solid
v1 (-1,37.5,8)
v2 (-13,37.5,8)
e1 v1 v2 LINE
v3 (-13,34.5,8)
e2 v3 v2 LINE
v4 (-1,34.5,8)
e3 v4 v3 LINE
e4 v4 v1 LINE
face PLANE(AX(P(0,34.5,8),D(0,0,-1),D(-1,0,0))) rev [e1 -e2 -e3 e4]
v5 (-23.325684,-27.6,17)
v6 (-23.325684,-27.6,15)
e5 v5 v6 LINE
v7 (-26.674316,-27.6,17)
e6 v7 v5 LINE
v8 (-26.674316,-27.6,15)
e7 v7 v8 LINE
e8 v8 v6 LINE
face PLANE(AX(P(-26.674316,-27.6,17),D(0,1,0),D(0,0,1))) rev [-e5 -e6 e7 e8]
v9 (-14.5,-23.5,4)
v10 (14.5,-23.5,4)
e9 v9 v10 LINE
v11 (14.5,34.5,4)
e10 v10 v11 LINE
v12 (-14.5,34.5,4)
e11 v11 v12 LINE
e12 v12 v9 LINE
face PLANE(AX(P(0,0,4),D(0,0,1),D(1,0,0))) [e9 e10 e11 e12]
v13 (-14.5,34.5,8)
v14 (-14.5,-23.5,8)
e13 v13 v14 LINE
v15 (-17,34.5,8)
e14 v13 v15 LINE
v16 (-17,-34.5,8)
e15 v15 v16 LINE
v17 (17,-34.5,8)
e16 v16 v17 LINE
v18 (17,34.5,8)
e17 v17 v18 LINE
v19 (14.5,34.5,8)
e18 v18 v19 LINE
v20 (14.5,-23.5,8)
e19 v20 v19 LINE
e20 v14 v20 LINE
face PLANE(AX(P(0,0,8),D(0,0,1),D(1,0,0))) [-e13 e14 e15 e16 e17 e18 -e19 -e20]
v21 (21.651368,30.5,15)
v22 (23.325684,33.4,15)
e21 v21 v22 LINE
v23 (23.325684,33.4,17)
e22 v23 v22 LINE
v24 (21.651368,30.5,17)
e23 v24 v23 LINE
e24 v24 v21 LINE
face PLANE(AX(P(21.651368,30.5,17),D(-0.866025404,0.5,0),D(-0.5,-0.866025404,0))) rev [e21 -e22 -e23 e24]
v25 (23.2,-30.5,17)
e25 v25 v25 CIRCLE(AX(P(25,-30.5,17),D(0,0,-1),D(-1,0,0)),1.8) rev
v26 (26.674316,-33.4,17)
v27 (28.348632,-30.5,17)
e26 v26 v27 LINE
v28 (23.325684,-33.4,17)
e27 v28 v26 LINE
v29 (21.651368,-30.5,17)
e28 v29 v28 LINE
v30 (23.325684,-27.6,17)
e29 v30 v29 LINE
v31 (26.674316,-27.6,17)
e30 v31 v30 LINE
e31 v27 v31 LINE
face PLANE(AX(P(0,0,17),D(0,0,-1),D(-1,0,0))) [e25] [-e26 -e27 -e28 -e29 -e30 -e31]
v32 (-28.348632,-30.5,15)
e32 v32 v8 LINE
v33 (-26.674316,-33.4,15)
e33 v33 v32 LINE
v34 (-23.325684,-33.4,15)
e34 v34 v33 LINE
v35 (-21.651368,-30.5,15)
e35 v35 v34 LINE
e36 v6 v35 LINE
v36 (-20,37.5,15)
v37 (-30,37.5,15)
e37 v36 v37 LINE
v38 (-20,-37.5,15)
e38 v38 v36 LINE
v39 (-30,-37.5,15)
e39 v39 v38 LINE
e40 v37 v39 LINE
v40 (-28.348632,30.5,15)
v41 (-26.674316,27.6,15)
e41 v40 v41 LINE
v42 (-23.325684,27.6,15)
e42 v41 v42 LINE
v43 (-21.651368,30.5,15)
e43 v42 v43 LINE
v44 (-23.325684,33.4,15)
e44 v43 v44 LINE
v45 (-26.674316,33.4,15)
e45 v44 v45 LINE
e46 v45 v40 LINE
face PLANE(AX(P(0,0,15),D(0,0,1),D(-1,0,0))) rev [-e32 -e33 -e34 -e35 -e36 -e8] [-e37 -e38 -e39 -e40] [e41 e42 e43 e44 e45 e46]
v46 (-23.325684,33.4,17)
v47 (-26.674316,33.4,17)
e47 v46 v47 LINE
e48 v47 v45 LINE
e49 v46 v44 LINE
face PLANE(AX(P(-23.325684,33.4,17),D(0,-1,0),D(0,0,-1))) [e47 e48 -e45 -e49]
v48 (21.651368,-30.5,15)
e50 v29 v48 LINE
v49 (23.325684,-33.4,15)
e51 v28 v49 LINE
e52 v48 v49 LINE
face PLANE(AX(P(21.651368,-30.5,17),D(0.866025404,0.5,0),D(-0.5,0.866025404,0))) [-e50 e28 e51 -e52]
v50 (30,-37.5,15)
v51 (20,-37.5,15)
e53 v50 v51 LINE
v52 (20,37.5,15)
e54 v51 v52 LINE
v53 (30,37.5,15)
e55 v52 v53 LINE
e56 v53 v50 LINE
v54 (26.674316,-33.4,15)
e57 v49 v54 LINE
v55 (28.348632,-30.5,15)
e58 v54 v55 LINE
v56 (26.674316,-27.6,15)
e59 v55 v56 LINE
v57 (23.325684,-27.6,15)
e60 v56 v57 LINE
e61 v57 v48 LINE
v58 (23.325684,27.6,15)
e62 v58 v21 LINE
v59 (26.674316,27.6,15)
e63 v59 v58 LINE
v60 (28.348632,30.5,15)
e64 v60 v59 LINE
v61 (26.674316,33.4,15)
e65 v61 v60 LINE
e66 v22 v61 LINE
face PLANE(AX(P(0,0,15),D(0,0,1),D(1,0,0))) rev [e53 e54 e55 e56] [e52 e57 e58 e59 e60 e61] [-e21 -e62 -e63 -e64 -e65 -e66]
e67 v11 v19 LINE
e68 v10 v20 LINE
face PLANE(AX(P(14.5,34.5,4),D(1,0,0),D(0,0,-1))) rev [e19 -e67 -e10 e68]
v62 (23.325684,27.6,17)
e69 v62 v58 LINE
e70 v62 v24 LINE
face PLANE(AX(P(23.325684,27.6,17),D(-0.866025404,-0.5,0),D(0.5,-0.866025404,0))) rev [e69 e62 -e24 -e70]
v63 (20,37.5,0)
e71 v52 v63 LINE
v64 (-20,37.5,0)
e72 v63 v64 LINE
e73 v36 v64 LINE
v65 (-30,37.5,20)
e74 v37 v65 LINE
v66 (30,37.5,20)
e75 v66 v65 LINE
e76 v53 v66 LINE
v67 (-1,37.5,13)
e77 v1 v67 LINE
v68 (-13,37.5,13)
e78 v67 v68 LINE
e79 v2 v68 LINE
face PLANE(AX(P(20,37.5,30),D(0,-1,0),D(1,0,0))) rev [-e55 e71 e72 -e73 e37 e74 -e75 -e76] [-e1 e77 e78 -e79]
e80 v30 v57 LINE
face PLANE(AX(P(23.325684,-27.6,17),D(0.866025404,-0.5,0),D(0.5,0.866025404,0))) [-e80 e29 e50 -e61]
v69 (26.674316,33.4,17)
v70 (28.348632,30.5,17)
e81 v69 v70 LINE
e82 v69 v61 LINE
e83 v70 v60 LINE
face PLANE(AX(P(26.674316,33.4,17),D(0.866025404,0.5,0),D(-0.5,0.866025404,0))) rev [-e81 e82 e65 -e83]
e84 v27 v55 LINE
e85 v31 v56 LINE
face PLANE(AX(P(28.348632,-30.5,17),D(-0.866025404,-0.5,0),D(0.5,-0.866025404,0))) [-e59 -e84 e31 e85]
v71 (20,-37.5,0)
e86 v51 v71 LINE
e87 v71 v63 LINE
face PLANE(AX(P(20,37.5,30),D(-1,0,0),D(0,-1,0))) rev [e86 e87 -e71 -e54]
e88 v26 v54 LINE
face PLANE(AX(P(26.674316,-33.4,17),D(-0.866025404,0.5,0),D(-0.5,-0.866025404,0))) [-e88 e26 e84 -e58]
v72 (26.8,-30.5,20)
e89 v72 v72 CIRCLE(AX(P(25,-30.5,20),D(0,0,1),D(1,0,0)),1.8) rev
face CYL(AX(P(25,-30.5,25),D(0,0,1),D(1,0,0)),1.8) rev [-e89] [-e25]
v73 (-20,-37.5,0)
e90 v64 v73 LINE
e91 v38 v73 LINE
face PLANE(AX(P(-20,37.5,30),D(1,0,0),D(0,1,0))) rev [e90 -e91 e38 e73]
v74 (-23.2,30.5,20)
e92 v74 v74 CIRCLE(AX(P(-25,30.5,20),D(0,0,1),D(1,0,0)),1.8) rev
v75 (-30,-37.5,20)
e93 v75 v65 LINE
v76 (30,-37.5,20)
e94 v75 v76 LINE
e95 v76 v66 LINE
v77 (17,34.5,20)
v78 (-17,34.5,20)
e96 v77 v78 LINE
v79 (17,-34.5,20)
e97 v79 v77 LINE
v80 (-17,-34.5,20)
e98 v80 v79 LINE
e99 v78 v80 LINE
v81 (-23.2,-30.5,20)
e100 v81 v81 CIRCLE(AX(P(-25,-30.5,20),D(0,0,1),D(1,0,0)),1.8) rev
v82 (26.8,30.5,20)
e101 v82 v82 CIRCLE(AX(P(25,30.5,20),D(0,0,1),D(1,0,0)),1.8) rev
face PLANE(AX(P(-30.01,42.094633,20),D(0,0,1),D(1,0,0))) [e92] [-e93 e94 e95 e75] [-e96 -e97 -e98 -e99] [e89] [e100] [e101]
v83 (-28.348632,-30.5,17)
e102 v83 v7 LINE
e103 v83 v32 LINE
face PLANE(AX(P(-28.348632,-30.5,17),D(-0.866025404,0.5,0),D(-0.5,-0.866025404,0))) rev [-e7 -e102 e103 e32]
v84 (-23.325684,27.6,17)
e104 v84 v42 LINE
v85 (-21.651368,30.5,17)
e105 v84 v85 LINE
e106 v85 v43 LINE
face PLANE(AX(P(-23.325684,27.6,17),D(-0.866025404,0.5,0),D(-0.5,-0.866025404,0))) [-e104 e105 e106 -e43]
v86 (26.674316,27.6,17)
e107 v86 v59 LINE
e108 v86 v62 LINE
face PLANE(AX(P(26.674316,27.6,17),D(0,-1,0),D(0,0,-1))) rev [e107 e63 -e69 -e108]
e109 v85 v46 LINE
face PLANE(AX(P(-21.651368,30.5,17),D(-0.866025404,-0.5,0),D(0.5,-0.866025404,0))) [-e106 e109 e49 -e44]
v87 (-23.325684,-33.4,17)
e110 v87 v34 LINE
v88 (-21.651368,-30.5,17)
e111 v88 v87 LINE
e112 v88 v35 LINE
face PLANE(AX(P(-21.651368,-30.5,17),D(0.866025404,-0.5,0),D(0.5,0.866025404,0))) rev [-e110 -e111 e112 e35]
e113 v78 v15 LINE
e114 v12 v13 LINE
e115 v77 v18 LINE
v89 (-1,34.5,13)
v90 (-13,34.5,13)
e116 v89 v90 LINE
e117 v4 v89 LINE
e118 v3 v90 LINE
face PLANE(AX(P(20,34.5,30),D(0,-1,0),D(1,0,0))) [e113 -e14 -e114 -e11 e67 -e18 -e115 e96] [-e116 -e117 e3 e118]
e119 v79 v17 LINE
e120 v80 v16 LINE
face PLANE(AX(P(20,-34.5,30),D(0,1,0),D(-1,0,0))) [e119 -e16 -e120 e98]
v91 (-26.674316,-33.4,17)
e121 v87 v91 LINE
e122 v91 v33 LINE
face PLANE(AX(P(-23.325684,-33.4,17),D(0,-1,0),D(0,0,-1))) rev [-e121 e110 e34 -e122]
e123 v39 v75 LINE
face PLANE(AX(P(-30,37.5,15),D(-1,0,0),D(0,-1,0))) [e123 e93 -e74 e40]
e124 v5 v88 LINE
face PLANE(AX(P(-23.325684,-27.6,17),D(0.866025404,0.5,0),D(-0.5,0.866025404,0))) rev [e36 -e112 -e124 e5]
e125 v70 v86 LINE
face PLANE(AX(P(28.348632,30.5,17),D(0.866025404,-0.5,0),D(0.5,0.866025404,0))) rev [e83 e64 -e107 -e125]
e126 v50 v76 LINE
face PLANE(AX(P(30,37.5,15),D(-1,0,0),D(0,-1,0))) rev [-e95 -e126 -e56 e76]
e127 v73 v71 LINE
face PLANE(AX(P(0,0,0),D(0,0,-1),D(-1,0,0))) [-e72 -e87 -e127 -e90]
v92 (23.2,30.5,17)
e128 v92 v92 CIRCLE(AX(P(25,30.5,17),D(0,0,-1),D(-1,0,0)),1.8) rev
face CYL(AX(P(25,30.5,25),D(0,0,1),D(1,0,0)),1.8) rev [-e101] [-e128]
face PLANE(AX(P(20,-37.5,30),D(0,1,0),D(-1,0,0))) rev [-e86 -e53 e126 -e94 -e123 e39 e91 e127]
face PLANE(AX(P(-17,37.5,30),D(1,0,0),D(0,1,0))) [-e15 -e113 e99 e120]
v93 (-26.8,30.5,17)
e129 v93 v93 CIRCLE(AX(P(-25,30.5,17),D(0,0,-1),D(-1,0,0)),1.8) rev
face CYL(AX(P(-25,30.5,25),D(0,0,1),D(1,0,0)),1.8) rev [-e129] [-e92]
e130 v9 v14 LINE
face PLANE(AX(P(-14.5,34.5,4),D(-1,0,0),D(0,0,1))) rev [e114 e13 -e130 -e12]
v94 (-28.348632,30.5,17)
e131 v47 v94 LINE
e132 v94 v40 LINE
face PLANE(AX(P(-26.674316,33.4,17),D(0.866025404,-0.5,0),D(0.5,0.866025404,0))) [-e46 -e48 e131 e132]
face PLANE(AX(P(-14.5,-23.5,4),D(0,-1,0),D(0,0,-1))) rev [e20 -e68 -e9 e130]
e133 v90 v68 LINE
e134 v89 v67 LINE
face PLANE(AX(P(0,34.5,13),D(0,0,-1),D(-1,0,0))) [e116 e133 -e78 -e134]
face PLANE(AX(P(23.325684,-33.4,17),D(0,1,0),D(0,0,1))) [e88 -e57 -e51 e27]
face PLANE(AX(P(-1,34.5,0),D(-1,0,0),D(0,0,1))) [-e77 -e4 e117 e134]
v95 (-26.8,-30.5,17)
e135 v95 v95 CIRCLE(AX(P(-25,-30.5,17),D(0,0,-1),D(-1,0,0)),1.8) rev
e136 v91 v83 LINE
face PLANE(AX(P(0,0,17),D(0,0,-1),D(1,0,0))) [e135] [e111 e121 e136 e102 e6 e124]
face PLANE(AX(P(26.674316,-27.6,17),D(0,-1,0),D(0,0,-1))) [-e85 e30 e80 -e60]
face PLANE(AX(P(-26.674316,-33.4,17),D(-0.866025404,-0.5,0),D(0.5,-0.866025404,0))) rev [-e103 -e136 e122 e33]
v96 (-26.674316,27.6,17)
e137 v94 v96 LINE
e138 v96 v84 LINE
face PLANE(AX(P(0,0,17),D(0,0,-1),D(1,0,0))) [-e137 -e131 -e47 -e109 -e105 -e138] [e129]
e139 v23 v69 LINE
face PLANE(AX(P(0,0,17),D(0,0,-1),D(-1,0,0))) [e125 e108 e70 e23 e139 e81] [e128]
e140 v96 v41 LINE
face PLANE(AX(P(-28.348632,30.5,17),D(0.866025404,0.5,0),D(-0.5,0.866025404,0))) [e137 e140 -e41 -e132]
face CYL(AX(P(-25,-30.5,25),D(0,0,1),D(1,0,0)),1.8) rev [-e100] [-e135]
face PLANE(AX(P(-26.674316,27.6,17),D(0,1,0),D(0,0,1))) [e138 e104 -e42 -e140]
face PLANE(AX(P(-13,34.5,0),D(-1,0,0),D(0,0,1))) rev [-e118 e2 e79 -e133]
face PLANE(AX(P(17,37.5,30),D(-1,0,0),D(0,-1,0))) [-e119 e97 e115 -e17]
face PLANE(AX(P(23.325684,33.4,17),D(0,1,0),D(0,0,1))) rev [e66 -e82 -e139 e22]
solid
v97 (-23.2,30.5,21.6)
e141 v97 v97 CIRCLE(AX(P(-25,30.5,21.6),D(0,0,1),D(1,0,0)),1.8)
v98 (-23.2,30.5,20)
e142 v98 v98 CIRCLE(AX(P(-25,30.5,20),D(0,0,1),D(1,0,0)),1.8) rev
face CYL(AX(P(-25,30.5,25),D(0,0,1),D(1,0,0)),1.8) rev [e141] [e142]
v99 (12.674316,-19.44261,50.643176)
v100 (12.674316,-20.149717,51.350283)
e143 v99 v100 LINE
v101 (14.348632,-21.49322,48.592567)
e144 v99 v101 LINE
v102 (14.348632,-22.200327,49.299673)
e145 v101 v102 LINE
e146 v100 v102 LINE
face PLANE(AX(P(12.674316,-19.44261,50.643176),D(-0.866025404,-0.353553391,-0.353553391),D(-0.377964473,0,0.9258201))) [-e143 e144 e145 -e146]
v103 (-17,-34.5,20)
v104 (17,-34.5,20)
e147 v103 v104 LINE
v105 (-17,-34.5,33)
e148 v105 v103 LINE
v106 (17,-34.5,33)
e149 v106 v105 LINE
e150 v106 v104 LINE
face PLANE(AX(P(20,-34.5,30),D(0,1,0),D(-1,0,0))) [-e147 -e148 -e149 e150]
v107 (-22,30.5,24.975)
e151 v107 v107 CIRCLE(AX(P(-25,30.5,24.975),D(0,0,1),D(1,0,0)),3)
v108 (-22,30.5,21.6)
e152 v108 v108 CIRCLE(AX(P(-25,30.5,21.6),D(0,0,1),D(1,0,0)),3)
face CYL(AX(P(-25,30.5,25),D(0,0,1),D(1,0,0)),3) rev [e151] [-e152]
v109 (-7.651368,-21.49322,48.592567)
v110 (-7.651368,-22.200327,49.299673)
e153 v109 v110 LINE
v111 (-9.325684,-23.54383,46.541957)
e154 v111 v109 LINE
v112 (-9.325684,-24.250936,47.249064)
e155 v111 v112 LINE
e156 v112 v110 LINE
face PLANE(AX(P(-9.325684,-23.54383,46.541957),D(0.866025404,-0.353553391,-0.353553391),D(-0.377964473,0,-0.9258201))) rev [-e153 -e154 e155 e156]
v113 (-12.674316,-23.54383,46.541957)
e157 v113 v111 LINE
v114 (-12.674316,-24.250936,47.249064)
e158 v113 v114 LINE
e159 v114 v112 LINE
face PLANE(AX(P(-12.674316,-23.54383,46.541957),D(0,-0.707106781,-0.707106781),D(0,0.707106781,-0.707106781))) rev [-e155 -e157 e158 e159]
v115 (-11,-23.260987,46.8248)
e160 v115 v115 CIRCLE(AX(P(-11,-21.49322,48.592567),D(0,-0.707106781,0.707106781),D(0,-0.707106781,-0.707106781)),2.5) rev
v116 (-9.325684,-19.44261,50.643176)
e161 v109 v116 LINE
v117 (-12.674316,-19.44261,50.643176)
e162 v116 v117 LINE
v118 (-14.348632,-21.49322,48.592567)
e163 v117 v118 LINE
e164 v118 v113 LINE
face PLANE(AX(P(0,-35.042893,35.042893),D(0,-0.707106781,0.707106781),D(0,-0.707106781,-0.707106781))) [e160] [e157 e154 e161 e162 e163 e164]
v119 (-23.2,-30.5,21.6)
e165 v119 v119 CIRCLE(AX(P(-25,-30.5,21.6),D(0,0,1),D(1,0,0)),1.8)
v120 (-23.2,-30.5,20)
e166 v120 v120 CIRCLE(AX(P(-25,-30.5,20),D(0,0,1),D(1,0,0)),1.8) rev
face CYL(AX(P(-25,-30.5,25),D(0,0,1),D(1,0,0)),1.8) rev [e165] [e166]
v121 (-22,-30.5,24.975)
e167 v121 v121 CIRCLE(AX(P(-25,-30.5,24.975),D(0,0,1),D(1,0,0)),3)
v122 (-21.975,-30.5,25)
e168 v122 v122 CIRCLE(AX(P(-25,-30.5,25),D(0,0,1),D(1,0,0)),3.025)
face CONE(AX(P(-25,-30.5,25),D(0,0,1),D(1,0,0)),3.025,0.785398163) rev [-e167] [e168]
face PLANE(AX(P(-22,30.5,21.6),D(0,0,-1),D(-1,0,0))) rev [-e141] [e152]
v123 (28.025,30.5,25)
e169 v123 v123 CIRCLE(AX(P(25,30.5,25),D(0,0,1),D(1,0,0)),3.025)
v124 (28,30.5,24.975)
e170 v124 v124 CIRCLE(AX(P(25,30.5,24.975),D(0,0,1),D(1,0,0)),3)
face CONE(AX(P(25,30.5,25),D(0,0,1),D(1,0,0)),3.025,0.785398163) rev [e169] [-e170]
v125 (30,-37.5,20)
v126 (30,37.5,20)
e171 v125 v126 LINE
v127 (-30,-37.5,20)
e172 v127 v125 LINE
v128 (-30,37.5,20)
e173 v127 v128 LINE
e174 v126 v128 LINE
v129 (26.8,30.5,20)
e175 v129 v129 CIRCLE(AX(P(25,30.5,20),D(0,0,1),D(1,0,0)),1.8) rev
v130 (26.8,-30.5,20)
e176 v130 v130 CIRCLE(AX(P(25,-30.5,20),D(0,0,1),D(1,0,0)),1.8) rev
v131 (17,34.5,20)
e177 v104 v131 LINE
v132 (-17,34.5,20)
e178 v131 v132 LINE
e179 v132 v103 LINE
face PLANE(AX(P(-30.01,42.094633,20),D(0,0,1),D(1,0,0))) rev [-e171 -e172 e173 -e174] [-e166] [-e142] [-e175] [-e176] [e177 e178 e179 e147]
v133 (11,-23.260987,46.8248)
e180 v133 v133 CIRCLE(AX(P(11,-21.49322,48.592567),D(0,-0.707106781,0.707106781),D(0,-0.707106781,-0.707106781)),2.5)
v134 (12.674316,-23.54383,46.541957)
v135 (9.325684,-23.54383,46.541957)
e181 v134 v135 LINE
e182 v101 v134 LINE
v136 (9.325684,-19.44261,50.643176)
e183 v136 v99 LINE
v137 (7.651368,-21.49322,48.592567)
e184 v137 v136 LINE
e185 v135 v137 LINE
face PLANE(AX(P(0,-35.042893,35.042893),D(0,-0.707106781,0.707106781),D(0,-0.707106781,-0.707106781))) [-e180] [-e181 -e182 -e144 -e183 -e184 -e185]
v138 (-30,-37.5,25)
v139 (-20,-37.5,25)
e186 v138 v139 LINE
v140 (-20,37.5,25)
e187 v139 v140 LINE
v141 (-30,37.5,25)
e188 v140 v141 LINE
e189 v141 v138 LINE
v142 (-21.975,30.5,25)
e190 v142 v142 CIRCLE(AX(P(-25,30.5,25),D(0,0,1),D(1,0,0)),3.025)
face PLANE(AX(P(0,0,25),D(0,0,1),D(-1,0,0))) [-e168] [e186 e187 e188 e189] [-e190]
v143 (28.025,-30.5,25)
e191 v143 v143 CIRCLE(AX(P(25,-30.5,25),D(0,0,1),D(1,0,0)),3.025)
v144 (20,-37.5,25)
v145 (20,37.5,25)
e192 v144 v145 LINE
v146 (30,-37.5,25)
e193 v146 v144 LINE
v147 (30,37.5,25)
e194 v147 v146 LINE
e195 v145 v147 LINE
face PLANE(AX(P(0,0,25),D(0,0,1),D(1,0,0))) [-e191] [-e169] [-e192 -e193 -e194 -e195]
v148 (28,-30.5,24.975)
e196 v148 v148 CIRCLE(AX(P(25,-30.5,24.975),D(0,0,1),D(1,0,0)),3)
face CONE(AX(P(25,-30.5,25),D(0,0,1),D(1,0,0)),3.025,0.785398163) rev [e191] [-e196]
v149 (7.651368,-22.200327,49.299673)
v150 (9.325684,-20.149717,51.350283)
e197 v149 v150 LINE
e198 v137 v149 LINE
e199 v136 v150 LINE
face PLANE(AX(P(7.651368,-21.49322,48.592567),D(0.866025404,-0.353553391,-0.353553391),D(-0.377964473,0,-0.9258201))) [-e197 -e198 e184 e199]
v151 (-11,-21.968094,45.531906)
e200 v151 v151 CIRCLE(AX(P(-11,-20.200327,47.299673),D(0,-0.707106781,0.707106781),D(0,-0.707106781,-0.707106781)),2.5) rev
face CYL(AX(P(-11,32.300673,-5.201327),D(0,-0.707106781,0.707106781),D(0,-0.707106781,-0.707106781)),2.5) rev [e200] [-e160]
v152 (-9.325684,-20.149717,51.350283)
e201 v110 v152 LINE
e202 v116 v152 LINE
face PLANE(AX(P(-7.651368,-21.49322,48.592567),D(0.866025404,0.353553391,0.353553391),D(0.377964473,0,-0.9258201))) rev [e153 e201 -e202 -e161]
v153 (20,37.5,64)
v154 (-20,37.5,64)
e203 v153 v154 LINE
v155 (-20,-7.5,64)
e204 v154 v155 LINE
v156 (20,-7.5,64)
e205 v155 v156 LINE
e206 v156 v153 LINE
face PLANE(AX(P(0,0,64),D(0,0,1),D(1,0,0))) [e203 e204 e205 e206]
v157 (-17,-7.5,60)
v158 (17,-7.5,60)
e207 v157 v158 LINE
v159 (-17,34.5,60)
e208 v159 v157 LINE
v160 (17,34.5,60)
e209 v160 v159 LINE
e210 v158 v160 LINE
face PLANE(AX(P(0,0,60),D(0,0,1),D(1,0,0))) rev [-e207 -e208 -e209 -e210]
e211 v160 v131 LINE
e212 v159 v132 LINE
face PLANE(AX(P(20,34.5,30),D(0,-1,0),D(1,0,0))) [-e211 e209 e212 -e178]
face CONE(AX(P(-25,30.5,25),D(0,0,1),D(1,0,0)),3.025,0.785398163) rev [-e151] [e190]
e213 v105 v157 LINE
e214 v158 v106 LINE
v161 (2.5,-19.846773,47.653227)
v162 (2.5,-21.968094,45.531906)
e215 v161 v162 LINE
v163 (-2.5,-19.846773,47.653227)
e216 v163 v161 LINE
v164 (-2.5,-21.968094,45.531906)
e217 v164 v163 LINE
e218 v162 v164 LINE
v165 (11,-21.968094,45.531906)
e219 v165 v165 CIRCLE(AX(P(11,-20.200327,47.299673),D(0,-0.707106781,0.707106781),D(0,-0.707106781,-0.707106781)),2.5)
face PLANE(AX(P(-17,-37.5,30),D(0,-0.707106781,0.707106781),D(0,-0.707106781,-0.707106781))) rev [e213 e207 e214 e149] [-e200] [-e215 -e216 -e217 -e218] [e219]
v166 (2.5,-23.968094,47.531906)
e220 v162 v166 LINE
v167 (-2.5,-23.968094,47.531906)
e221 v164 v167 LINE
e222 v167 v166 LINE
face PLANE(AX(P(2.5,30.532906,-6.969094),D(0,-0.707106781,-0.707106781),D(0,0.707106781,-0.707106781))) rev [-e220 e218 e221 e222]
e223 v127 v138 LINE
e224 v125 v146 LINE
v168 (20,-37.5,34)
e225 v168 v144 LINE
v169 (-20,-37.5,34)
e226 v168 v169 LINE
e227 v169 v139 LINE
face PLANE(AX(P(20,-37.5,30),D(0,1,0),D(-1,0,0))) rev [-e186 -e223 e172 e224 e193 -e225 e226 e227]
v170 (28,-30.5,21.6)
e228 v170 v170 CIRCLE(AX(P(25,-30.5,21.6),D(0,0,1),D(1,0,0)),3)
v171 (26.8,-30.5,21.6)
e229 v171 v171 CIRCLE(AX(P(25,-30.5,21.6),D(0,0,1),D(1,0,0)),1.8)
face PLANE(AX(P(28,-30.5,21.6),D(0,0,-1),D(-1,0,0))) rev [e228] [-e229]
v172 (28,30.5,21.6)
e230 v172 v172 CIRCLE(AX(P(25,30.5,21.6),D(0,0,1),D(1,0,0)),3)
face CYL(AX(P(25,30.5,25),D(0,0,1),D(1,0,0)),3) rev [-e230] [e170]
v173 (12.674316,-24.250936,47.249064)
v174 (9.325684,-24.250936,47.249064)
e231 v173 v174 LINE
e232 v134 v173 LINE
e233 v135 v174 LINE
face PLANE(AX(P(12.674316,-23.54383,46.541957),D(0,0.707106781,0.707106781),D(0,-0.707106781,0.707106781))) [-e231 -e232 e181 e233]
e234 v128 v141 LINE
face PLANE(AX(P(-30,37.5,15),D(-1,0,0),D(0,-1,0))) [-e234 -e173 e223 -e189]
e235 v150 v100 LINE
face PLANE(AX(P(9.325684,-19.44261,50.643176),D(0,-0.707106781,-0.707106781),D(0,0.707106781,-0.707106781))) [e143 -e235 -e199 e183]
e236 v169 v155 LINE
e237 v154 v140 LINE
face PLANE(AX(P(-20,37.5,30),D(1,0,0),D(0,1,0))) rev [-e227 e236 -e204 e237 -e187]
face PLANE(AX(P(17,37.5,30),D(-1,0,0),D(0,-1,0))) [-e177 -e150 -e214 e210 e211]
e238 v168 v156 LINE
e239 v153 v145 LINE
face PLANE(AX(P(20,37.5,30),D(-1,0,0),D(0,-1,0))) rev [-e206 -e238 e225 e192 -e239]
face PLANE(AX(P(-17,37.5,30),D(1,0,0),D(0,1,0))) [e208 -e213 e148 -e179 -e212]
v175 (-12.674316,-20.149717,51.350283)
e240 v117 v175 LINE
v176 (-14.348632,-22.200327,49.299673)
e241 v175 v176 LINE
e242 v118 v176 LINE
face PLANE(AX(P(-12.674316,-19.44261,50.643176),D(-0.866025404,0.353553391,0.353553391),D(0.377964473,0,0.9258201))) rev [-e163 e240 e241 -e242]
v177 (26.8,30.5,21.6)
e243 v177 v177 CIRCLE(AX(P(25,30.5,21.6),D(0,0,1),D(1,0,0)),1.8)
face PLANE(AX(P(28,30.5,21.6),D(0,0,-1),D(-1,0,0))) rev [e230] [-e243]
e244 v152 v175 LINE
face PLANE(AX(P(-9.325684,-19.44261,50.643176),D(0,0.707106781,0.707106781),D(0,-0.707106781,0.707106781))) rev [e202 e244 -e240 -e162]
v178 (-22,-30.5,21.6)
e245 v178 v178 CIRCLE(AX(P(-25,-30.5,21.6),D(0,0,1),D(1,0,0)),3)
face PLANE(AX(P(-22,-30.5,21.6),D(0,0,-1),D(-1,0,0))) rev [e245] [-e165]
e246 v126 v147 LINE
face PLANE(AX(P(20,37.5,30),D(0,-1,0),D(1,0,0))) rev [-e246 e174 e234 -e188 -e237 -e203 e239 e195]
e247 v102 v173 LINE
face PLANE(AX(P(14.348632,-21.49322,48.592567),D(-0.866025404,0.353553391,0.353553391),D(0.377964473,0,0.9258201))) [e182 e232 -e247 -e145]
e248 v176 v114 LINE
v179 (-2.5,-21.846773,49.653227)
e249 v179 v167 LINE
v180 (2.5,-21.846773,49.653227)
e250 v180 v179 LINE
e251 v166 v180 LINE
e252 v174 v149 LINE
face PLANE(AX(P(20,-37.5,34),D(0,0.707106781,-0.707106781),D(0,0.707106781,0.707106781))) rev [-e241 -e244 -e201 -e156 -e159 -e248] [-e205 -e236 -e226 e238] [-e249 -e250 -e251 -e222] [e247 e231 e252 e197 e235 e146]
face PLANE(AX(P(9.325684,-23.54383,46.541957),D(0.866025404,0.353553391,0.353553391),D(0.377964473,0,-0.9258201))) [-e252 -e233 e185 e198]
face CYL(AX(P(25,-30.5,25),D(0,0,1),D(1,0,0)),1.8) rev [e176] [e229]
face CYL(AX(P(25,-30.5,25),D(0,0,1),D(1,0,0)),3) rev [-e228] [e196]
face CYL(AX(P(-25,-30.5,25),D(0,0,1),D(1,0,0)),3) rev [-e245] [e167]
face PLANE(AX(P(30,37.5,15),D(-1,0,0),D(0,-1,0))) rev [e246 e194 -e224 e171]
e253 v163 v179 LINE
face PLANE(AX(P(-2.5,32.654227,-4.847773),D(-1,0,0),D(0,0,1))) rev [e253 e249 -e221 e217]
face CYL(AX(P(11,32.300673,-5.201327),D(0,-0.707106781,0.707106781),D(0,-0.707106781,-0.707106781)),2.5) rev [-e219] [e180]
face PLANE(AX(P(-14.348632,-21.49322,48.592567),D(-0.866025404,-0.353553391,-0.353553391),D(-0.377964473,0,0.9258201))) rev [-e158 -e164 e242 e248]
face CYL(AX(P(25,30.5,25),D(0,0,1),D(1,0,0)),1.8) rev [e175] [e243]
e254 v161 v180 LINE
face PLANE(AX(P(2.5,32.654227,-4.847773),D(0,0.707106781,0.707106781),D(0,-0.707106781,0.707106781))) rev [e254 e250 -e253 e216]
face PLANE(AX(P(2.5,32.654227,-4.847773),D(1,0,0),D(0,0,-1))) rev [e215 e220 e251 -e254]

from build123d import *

# Parameters (mm, degrees)
SKETCH_1_W                     = 40
SKETCH_1_H                     = 75
EXTRUDE_1_DEPTH                = 30
SHELL_1_T                      = -3
SKETCH_2_W                     = 34
SKETCH_2_H                     = 69
EXTRUDE_2_DEPTH                = 5
SKETCH_3_W                     = 29
SKETCH_3_H                     = 58
CUT_EXTRUDE_1_DEPTH            = 4
SKETCH_4_W                     = 12
SKETCH_4_H                     = 5
CUT_EXTRUDE_2_DEPTH            = 3
SKETCH_5_W                     = 40
SKETCH_5_H                     = 75
SKETCH_5_W_2                   = 34
SKETCH_5_H_2                   = 69
EXTRUDE_5_DEPTH                = 30
CUT_EXTRUDE_START              = -40
CUT_EXTRUDE_5_DEPTH            = 40
SKETCH_8_W                     = 40
SKETCH_8_H                     = 45
EXTRUDE_6_DEPTH                = 4
SWEEP_START                    = -20
SWEEP_1_DEPTH                  = 40
CUT_EXTRUDE_6_REACH            = 85.926
SKETCH_12_R                    = 2.5
CUT_EXTRUDE_7_REACH            = 85.926
SKETCH_14_W                    = 5
SKETCH_14_H                    = 3
SKETCH_22_W                    = 10
SKETCH_22_H                    = 75
EXTRUDE_8_DEPTH                = 5
CUT_EXTRUDE_9_DEPTH            = 2
MIRROR_6_COPY_2_DEPTH          = 2
SPLIT_BODIES_2_SURFACE_1_BACK  = 116.417
SPLIT_BODIES_2_SURFACE_1_DEPTH = 232.834
SPLIT_BODIES_2_SURFACE_2_BACK  = 116.417
SPLIT_BODIES_2_SURFACE_2_DEPTH = 232.834
CUT_EXTRUDE_10_DEPTH           = 1


# Read off the part's stored shape, not the designer's step: 切除-拉伸5, 扫描1
with BuildPart() as part:
    # 草图1 → 凸台-拉伸1 (new body)
    with BuildSketch(Plane.XY):
        Rectangle(SKETCH_1_W, SKETCH_1_H)
    extrude(amount=EXTRUDE_1_DEPTH)

    # 抽壳1
    shell_1_openings = [part.faces().sort_by_distance(p)[0] for p in [
        (0, 0, 30),
    ]]
    offset(amount=SHELL_1_T, openings=shell_1_openings, kind=Kind.INTERSECTION)

    # 草图2 → 凸台-拉伸2 (add)
    with BuildSketch(Plane.XY.offset(3)):
        Rectangle(SKETCH_2_W, SKETCH_2_H)
    extrude(amount=EXTRUDE_2_DEPTH)

    # 草图3 → 切除-拉伸1 (cut)
    with BuildSketch(Plane.XY.offset(8)):
        with Locations((0, 5.5)):
            Rectangle(SKETCH_3_W, SKETCH_3_H)
    extrude(amount=-CUT_EXTRUDE_1_DEPTH, mode=Mode.SUBTRACT)

    # 草图4 → 切除-拉伸2 (cut)
    with BuildSketch(Plane(origin=(0, 37.5, 0), x_dir=(1, 0, 0), z_dir=(0, 1, 0))):
        with Locations((-7, -10.5)):
            Rectangle(SKETCH_4_W, SKETCH_4_H)
    extrude(amount=-CUT_EXTRUDE_2_DEPTH, mode=Mode.SUBTRACT)

    # 草图5 → 凸台-拉伸5 (add)
    with BuildSketch(Plane.XY.offset(30)):
        Rectangle(SKETCH_5_W, SKETCH_5_H)
        Rectangle(SKETCH_5_W_2, SKETCH_5_H_2, mode=Mode.SUBTRACT)
    extrude(amount=EXTRUDE_5_DEPTH)

    # 切除-拉伸5 outline → 切除-拉伸5 (cut)
    with BuildSketch(Plane.ZY.offset(20).offset(CUT_EXTRUDE_START)):
        Polygon((60, -7.5), (30, -37.5), (60, -37.5), align=None)
    extrude(amount=CUT_EXTRUDE_5_DEPTH, mode=Mode.SUBTRACT)

    # 草图8 → 凸台-拉伸6 (add)
    with BuildSketch(Plane.XY.offset(60)):
        with Locations((0, 15)):
            Rectangle(SKETCH_8_W, SKETCH_8_H)
    extrude(amount=EXTRUDE_6_DEPTH)

    # 扫描1 outline → 扫描1 (add)
    with BuildSketch(Plane.YZ.offset(SWEEP_START)):
        Polygon((-37.5, 34), (-37.5, 30), (-7.5, 60), (-7.5, 64), align=None)
    extrude(amount=SWEEP_1_DEPTH)

    # 草图12 → 切除-拉伸6 (cut, up to next)
    with BuildSketch(Plane(origin=(0, -35.75, 35.75), x_dir=(1, 0, 0), z_dir=(0, -0.7071067811865487, 0.7071067811865465)), mode=Mode.PRIVATE) as cut_extrude_6_sk1:
        with Locations(Location((-11, 19.162131789, 0), (0, 0, 270))):
            Circle(SKETCH_12_R)
    cut_extrude_6_tool1 = extrude(cut_extrude_6_sk1.sketch, amount=-CUT_EXTRUDE_6_REACH, mode=Mode.PRIVATE) & part.part
    cut_extrude_6 = cut_extrude_6_tool1.solids().sort_by_distance((-11, -22.200327, 49.299673))[0]
    add(cut_extrude_6, mode=Mode.SUBTRACT)

    # 镜向1: 切除-拉伸6 across plane
    add(cut_extrude_6.mirror(Plane(origin=(0, 0, 0), x_dir=(0, 0, 1), z_dir=(1, 0, 0))), mode=Mode.SUBTRACT)

    # 草图14 → 切除-拉伸7 (cut, up to next)
    with BuildSketch(Plane(origin=(0, -35.75, 35.75), x_dir=(1, 0, 0), z_dir=(0, -0.7071067811865487, 0.7071067811865465)), mode=Mode.PRIVATE) as cut_extrude_7_sk1:
        with Locations((0, 18.162131789)):
            Rectangle(SKETCH_14_W, SKETCH_14_H)
    cut_extrude_7_tool1 = extrude(cut_extrude_7_sk1.sketch, amount=-CUT_EXTRUDE_7_REACH, mode=Mode.PRIVATE) & part.part
    add(cut_extrude_7_tool1.solids().sort_by_distance((0, -22.907433, 48.592567))[0], mode=Mode.SUBTRACT)

    # 草图22 → 凸台-拉伸8 (add, symmetric)
    with BuildSketch(Plane(origin=(0, 0, 20), x_dir=(-1, 0, 0), z_dir=(0, 0, -1))):
        with Locations((-25, 0)):
            Rectangle(SKETCH_22_W, SKETCH_22_H)
    extrude_8 = extrude(amount=EXTRUDE_8_DEPTH, both=True)

    # 草图24 → M3 六角圆柱头螺钉的柱形沉头孔2 (revolve, cut)
    with BuildSketch(Plane(origin=(25, 30.5, 25), x_dir=(0, -1, 0), z_dir=(1, 0, 0))):
        Polygon((0, 0), (0, 10), (1.8, 10), (1.8, 3.4), (3, 3.4), (3, 0.025), (3.025, 0), align=None)
    hole_wizard_m3_2 = revolve(axis=Axis((25, 30.5, 31.35), (0, 0, -1)), mode=Mode.SUBTRACT)

    # 草图25 → 切除-拉伸9 (cut)
    with BuildSketch(Plane(origin=(0, 0, 15), x_dir=(-1, 0, 0), z_dir=(0, 0, -1))):
        Polygon((-28.348631561, 30.5), (-26.674315781, 27.6), (-23.325684219, 27.6), (-21.651368439, 30.5), (-23.325684219, 33.4), (-26.674315781, 33.4), align=None)
    cut_extrude_9 = extrude(amount=-CUT_EXTRUDE_9_DEPTH, mode=Mode.SUBTRACT)

    # 镜向4: M3 六角圆柱头螺钉的柱形沉头孔2, 切除-拉伸9 across plane
    add(hole_wizard_m3_2.mirror(Plane.ZX), mode=Mode.SUBTRACT)
    add(cut_extrude_9.mirror(Plane.ZX), mode=Mode.SUBTRACT)

    # 镜向6: 凸台-拉伸8, M3 六角圆柱头螺钉的柱形沉头孔2, 切除-拉伸9 across plane
    add(extrude_8.mirror(Plane(origin=(0, 0, 0), x_dir=(0, 0, 1), z_dir=(1, 0, 0))))
    add(hole_wizard_m3_2.mirror(Plane(origin=(0, 0, 0), x_dir=(0, 0, 1), z_dir=(1, 0, 0))), mode=Mode.SUBTRACT)
    add(cut_extrude_9.mirror(Plane(origin=(0, 0, 0), x_dir=(0, 0, 1), z_dir=(1, 0, 0))), mode=Mode.SUBTRACT)

    # 镜向6 copy 1 sketch → 镜向6 copy 1 (revolve, cut)
    with BuildSketch(Plane(origin=(-25, -30.5, 25), x_dir=(0, 1, 0), z_dir=(-1, 0, 0))):
        Polygon((0, 0), (0, 10), (1.8, 10), (1.8, 3.4), (3, 3.4), (3, 0.025), (3.025, 0), align=None)
    revolve(axis=Axis((-25, -30.5, 31.35), (0, 0, -1)), mode=Mode.SUBTRACT)

    # 镜向6 copy 2 sketch → 镜向6 copy 2 (cut)
    with BuildSketch(Plane(origin=(0, 0, 15), x_dir=(1, 0, 0), z_dir=(0, 0, -1))):
        Polygon((-28.348631561, 30.5), (-26.674315781, 27.6), (-23.325684219, 27.6), (-21.651368439, 30.5), (-23.325684219, 33.4), (-26.674315781, 33.4), align=None)
    extrude(amount=-MIRROR_6_COPY_2_DEPTH, mode=Mode.SUBTRACT)


with BuildPart() as body_2:
    # Split Bodies 2: the piece behind the surface
    add(part.part)
    # Split Bodies 2 surface: a surface, the sketch's curves swept straight by 232.834 mm
    with BuildLine(Plane(origin=(30, 0, 0), x_dir=(0, 0, -1), z_dir=(1, 0, 0)).offset(-SPLIT_BODIES_2_SURFACE_1_BACK), mode=Mode.PRIVATE) as split_bodies_2_surface_1_path:
        Line((-20, 42.094632645), (-20, -46.024022385))
    split_bodies_2_surface_1 = Shell.extrude(split_bodies_2_surface_1_path.wire(), (1 * SPLIT_BODIES_2_SURFACE_1_DEPTH, 0 * SPLIT_BODIES_2_SURFACE_1_DEPTH, 0 * SPLIT_BODIES_2_SURFACE_1_DEPTH))
    split(bisect_by=split_bodies_2_surface_1, keep=Keep.BOTTOM)

    # 草图27 → 切除-拉伸10 (cut)
    with BuildSketch(Plane(origin=(0, -35.75, 35.75), x_dir=(1, 0, 0), z_dir=(0, -0.7071067811865487, 0.7071067811865465))):
        Polygon((-14.348631561, 19.162131789), (-12.674315781, 16.262131789), (-9.325684219, 16.262131789), (-7.651368439, 19.162131789), (-9.325684219, 22.062131789), (-12.674315781, 22.062131789), align=None)
    cut_extrude_10 = extrude(amount=-CUT_EXTRUDE_10_DEPTH, mode=Mode.SUBTRACT)

    # 镜向7: 切除-拉伸10 across plane
    add(cut_extrude_10.mirror(Plane(origin=(0, 0, 0), x_dir=(0, 0, 1), z_dir=(1, 0, 0))), mode=Mode.SUBTRACT)


with BuildPart() as part_1:
    add(part.part)

    # Split Bodies 2: split by a surface, the side it looks to stays
    # Split Bodies 2 surface: a surface, the sketch's curves swept straight by 232.834 mm
    with BuildLine(Plane(origin=(30, 0, 0), x_dir=(0, 0, -1), z_dir=(1, 0, 0)).offset(-SPLIT_BODIES_2_SURFACE_2_BACK), mode=Mode.PRIVATE) as split_bodies_2_surface_2_path:
        Line((-20, 42.094632645), (-20, -46.024022385))
    split_bodies_2_surface_2 = Shell.extrude(split_bodies_2_surface_2_path.wire(), (1 * SPLIT_BODIES_2_SURFACE_2_DEPTH, 0 * SPLIT_BODIES_2_SURFACE_2_DEPTH, 0 * SPLIT_BODIES_2_SURFACE_2_DEPTH))
    split(bisect_by=split_bodies_2_surface_2, keep=Keep.TOP)


solid = Compound([body_2.part, part_1.part])
